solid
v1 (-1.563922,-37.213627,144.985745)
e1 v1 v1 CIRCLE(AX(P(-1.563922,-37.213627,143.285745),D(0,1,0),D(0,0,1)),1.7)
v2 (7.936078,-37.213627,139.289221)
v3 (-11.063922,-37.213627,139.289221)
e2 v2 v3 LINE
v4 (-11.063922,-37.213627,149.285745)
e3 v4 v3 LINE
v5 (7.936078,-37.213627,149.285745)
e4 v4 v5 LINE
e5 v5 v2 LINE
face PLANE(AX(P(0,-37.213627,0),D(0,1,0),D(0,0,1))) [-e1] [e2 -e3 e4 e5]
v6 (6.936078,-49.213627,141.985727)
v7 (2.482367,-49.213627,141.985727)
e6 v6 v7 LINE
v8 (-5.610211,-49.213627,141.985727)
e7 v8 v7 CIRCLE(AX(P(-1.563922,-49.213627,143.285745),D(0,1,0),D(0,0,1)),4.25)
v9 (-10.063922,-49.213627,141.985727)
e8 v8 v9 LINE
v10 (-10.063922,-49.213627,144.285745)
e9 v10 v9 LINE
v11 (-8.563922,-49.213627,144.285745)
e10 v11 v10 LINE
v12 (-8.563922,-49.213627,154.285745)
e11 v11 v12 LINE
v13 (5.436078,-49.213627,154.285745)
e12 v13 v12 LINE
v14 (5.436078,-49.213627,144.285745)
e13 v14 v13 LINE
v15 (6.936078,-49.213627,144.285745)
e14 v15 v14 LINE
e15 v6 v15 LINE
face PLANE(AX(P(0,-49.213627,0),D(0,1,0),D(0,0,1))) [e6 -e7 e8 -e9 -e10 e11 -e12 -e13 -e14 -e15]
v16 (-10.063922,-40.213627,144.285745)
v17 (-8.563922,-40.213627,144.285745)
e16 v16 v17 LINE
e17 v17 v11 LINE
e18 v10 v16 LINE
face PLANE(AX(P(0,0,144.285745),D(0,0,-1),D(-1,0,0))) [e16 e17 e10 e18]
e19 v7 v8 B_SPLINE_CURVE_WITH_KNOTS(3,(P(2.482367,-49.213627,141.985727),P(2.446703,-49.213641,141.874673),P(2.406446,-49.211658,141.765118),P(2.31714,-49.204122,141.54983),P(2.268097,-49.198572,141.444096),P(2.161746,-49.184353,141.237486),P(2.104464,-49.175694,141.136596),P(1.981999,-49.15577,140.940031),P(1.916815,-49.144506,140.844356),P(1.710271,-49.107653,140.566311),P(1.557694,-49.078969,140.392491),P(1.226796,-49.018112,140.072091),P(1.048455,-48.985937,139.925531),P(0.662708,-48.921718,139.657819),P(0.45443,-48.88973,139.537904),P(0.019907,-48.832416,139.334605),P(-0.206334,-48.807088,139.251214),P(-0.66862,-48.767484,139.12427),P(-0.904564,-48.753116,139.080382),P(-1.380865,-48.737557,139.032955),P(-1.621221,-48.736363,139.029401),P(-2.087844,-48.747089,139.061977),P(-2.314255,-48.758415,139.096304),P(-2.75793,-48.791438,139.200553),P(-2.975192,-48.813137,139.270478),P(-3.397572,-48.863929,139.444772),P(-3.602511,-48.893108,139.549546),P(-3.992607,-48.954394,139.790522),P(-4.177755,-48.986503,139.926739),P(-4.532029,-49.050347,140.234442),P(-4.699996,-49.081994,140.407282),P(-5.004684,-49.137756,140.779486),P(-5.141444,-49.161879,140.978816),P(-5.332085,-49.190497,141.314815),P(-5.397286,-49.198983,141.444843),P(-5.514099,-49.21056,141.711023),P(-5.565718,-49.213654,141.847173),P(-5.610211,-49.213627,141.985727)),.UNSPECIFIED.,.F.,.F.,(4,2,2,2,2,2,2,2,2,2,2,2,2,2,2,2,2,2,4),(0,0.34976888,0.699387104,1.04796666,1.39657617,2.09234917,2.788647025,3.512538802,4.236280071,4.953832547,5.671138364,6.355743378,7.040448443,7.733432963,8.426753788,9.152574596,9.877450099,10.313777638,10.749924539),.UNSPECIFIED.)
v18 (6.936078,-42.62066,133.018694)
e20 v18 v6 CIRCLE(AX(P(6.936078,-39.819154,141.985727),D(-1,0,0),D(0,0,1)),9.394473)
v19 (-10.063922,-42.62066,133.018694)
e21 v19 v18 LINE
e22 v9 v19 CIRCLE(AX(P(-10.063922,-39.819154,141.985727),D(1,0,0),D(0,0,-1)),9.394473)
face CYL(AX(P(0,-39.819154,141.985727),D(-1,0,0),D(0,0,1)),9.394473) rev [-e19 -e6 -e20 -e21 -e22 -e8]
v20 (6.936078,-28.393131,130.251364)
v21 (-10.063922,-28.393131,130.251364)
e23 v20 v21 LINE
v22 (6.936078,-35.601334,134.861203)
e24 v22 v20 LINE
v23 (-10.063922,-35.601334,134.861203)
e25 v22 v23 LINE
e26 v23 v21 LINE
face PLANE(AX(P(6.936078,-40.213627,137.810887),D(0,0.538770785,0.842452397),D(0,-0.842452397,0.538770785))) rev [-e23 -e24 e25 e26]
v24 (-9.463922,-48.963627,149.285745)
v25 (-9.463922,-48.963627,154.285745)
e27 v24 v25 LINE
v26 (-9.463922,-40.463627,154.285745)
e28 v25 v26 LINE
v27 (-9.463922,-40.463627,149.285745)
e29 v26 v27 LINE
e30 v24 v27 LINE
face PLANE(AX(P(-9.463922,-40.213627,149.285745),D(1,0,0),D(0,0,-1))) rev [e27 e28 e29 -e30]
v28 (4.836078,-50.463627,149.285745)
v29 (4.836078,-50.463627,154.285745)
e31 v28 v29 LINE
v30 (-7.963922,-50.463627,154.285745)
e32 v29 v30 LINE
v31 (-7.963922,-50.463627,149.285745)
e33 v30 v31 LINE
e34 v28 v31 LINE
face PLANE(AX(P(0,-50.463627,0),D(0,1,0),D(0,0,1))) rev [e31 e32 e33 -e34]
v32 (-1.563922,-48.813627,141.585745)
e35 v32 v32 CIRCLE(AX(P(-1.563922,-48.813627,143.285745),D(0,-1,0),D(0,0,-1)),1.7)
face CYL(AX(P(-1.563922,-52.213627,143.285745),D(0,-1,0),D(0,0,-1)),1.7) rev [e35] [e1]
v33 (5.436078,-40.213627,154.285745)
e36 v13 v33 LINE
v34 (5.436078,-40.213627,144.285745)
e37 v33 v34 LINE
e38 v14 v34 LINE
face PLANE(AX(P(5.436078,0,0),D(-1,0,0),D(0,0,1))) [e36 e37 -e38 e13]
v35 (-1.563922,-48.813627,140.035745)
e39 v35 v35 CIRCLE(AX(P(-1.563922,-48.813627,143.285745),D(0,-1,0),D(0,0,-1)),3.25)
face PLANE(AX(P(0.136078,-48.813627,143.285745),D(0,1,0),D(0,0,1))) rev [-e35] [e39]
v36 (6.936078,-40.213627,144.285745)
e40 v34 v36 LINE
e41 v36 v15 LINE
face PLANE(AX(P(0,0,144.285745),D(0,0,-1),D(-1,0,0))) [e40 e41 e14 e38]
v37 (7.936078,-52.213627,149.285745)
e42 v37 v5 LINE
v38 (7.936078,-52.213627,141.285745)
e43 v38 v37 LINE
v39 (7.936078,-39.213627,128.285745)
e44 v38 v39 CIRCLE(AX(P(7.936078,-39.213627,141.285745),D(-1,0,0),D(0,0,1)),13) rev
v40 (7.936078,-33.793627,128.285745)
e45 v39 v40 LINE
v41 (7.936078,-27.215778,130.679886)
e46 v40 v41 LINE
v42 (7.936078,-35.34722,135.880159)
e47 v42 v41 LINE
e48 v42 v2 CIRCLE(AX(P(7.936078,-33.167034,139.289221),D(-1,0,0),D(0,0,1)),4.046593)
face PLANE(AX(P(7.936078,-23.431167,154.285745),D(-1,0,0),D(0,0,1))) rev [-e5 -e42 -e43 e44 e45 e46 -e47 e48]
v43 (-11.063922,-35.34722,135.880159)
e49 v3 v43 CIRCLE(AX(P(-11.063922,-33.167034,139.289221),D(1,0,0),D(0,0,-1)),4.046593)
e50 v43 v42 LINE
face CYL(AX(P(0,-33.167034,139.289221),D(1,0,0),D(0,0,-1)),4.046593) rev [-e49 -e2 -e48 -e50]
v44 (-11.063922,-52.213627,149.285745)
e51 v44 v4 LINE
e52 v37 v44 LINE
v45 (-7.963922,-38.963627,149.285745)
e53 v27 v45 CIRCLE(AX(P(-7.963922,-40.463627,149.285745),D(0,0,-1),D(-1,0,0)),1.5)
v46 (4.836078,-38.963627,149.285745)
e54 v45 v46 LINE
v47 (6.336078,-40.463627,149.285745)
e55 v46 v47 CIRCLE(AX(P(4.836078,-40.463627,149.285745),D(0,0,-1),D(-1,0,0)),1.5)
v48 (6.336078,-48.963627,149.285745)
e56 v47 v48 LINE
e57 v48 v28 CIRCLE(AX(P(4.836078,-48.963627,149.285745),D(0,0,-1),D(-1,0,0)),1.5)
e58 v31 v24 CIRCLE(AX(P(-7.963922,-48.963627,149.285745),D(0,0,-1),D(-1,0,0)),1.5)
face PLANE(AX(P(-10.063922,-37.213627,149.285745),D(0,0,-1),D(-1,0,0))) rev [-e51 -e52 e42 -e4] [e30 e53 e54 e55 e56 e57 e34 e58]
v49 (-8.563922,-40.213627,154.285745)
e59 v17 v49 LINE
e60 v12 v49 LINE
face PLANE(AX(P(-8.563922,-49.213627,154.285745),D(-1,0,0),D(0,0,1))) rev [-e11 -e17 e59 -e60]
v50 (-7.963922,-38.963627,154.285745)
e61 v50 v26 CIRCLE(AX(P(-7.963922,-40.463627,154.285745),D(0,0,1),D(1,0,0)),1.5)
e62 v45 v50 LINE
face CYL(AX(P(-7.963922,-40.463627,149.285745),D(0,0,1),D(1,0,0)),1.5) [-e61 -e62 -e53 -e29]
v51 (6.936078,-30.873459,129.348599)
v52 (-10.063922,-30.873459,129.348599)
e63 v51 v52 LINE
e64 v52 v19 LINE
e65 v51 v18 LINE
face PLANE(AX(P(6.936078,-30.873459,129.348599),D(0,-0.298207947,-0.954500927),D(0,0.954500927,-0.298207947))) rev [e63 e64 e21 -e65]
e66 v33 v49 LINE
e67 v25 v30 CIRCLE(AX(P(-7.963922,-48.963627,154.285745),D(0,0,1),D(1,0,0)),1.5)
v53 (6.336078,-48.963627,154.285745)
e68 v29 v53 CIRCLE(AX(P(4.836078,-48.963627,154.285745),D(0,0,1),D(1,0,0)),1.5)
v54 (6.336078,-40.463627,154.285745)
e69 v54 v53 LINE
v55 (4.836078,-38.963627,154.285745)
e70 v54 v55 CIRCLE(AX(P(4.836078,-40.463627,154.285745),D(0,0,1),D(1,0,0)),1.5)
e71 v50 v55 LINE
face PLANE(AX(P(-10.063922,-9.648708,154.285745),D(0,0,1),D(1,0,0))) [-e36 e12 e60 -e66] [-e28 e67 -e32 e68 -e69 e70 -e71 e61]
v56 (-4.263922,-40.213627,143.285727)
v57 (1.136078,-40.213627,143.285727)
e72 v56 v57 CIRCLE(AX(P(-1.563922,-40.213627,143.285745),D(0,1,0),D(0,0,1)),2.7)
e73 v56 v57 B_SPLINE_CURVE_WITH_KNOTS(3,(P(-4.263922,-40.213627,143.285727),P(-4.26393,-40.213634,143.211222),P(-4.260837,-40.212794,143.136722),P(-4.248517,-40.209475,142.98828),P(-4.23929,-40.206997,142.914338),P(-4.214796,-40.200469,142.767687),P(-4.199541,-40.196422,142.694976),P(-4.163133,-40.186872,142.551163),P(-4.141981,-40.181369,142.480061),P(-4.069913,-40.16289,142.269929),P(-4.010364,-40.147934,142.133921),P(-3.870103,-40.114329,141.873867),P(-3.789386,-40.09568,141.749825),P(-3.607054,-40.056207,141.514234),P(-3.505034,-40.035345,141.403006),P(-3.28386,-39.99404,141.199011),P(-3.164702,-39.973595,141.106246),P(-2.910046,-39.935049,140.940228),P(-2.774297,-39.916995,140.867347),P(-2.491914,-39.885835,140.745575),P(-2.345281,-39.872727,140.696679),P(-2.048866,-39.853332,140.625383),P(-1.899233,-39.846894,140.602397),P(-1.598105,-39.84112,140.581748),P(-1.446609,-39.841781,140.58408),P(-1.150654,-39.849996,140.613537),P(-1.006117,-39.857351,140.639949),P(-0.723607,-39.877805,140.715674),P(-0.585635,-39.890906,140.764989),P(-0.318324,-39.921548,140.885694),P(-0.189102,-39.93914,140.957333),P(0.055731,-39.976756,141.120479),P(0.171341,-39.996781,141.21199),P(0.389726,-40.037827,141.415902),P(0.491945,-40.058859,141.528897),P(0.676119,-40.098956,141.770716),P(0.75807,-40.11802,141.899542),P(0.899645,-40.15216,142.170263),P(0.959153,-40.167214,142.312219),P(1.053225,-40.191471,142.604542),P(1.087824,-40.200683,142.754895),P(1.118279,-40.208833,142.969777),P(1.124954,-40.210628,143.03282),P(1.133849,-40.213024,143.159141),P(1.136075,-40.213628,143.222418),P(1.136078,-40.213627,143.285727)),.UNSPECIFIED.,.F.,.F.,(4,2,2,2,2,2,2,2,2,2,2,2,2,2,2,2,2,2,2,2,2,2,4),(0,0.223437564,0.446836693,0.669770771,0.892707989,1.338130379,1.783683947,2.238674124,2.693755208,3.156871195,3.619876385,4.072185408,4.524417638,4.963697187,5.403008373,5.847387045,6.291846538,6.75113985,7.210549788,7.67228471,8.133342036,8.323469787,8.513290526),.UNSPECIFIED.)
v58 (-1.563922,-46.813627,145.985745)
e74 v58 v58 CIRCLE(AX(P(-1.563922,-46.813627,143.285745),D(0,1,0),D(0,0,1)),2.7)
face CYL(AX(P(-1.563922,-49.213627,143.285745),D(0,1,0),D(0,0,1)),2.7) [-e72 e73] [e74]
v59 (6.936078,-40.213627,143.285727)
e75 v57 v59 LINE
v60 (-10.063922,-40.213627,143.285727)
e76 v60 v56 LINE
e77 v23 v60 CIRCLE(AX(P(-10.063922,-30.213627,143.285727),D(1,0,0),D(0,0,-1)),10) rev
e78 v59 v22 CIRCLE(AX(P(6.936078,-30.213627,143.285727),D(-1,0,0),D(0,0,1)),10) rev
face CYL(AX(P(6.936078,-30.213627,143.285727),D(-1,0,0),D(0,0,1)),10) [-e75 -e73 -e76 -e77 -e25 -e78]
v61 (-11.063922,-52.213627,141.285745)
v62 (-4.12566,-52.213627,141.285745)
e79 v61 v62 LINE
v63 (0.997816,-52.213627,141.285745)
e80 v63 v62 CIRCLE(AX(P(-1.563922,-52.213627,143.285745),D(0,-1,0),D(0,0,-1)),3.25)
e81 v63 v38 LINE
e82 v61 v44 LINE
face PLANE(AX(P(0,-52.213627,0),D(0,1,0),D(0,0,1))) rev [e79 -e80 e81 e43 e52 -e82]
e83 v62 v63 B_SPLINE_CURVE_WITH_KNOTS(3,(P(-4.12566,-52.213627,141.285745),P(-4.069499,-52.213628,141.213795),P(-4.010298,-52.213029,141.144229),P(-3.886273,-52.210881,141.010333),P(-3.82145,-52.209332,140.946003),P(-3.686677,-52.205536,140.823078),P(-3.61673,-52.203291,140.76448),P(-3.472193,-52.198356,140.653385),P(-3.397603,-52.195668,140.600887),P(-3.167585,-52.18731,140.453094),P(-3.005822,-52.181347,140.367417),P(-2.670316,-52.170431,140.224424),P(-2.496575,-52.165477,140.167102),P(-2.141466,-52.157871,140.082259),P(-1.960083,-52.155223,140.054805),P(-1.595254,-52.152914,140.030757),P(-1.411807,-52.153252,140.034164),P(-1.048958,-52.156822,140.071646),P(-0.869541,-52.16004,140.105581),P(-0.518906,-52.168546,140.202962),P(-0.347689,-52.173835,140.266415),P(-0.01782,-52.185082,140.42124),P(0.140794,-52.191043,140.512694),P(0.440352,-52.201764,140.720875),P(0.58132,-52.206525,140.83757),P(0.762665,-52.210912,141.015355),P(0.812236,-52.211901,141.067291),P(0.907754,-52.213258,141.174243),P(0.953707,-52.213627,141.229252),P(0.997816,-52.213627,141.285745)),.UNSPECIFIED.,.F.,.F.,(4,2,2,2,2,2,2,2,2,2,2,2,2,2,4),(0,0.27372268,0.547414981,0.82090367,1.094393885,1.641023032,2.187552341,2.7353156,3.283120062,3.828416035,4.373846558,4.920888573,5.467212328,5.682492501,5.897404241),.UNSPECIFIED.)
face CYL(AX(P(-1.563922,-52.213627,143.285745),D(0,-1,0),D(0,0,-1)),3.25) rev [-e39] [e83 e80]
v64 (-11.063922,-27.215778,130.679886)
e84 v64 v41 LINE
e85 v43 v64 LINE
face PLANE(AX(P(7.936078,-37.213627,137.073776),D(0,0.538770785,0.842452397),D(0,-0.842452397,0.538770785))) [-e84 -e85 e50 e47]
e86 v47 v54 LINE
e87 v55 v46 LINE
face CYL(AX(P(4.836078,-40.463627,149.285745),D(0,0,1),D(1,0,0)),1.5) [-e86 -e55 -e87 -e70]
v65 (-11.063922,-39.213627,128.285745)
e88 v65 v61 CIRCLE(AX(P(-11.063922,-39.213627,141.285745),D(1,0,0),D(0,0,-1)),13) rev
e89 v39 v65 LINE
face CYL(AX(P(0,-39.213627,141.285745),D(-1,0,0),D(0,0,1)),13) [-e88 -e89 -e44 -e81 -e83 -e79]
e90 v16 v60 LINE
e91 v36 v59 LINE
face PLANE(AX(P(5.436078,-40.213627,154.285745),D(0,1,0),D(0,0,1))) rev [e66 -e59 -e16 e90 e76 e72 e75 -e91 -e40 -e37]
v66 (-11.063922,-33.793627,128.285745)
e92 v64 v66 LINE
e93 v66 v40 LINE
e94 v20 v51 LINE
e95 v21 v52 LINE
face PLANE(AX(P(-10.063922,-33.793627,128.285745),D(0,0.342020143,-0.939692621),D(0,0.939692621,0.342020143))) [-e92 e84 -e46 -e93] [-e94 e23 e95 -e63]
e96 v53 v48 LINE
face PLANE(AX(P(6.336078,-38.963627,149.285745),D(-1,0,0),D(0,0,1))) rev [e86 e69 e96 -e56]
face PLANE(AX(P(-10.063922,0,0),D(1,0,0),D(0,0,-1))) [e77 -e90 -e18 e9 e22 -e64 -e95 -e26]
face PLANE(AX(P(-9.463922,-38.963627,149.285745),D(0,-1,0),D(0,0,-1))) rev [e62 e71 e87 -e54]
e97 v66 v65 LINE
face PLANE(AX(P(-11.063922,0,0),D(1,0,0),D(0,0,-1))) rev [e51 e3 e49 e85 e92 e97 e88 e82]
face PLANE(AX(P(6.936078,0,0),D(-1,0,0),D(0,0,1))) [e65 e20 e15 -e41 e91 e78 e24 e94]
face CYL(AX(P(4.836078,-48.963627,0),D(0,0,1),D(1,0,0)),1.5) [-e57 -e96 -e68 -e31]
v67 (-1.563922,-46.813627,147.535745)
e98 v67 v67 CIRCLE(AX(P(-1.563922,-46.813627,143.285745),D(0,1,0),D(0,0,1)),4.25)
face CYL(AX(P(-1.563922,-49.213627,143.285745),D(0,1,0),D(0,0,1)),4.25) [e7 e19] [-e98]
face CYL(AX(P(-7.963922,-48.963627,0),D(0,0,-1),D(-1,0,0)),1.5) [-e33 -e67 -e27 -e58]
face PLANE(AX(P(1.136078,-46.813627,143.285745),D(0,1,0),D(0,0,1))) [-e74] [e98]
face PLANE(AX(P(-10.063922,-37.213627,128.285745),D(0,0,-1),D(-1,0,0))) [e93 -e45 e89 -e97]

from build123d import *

# Parameters (mm, degrees)
SALIENTE_EXTRUIR1_DEPTH                              = 18
SALIENTE_EXTRUIR2_DEPTH                              = 12
CORTAR_EXTRUIR1_DEPTH                                = 17
CROQUIS4_W                                           = 16.47485784
CROQUIS4_H                                           = 9
CORTAR_EXTRUIR2_DEPTH                                = 15.5
CORTAR_EXTRUIR3_DEPTH                                = 5
CROQUIS6_W                                           = 18
CROQUIS6_H                                           = 12.211968345
CORTAR_EXTRUIR4_DEPTH                                = 27.564918354
SALIENTE_EXTRUIR3_DEPTH                              = 9
SALIENTE_EXTRUIR4_DEPTH                              = 1.25
CROQUIS9_W                                           = 18
CROQUIS9_H                                           = 21
SALIENTE_EXTRUIR5_DEPTH                              = 1.75
CROQUIS10_W                                          = 1.5
CROQUIS10_H                                          = 9
CORTAR_EXTRUIR5_DEPTH                                = 6.47485784
CROQUIS11_W                                          = 1.5
CROQUIS11_H                                          = 9
CORTAR_EXTRUIR6_DEPTH                                = 6.47485784
SALIENTE_EXTRUIR6_DEPTH                              = 1
NGULO_DE_SALIDA1_ANGLE                               = 32.6
REFRENTADO_PARA_TORNILLO_CON_CABEZA_HEXA_D           = 3.4
REFRENTADO_PARA_TORNILLO_CON_CABEZA_HEXA_DEPTH       = 24.997848167
REFRENTADO_PARA_TORNILLO_CON_CABEZA_HEXA_CBORE_D     = 6.5
REFRENTADO_PARA_TORNILLO_CON_CABEZA_HEXA_CBORE_DEPTH = 3.4
REDONDEO1_R                                          = 1.5
REDONDEO2_R                                          = 4.046592592
REDONDEO3_R                                          = 9.394473
REDONDEO4_R                                          = 10
REDONDEO5_R                                          = 13.000000028


with BuildPart() as part:
    # Croquis1 → Saliente-Extruir1 (new body)
    with BuildSketch(Plane(origin=(7.936078108, 0, 0), x_dir=(0, 0, -1), z_dir=(1, 0, 0))):
        with BuildLine():
            Line((-154.285744598, -37.213626554), (-128.285744598, -37.213626554))
            Line((-128.285744598, -37.213626554), (-128.285744598, -33.793626733))
            Line((-128.285744598, -33.793626733), (-137.073776253, -9.6487082))
            Line((-137.073776253, -9.6487082), (-149.285744598, -9.6487082))
            add(Edge.make_bspline(
                [(-154.285744598, -9.6487082), (-152.619077931, -9.6487082), (-150.952411265, -9.6487082), (-149.285744598, -9.6487082)],
                knots=[0, 0, 0, 0, 1, 1, 1, 1], degree=3))
            add(Edge.make_bspline(
                [(-154.285744598, -9.6487082), (-154.285744598, -18.837014318), (-154.285744598, -28.025320436), (-154.285744598, -37.213626554)],
                knots=[0, 0, 0, 0, 1, 1, 1, 1], degree=3))
        make_face()
    extrude(amount=-SALIENTE_EXTRUIR1_DEPTH)

    # Croquis2 → Saliente-Extruir2 (add)
    with BuildSketch(Plane.XZ.offset(37.213626554)):
        with BuildLine():
            Line((-10.063921892, 154.285744598), (7.936078108, 154.285744598))
            add(Edge.make_bspline(
                [(7.936078108, 154.285744598), (7.936078108, 152.619077931), (7.936078108, 150.952411265), (7.936078108, 149.285744598)],
                knots=[0, 0, 0, 0, 1, 1, 1, 1], degree=3))
            Line((7.936078108, 149.285744598), (7.936078108, 128.285744598))
            Line((7.936078108, 128.285744598), (-10.063921892, 128.285744598))
            Line((-10.063921892, 128.285744598), (-10.063921892, 154.285744598))
        make_face()
    extrude(amount=SALIENTE_EXTRUIR2_DEPTH)

    # Croquis3 → Cortar-Extruir1 (cut)
    with BuildSketch(Plane.ZY.offset(10.063921892)):
        Polygon((135.078487354, -49.213626554), (137.810886758, -49.213626554), (137.810886758, -40.213626554), (130.25136436, -28.393130822), (129.348598898, -30.873458543), align=None)
    extrude(amount=-CORTAR_EXTRUIR1_DEPTH, mode=Mode.SUBTRACT)

    # Croquis4 → Cortar-Extruir2 (cut)
    with BuildSketch(Plane.ZY.offset(10.063921892)):
        with Locations((146.048315678, -44.713626554)):
            Rectangle(CROQUIS4_W, CROQUIS4_H)
    extrude(amount=-CORTAR_EXTRUIR2_DEPTH, mode=Mode.SUBTRACT)

    # Croquis5 → Cortar-Extruir3 (cut)
    with BuildSketch(Plane.XY.offset(154.285744598)):
        with BuildLine():
            Line((-10.063921892, -40.213626554), (-9.463921892, -40.213626554))
            Line((-9.463921892, -40.213626554), (-9.463921892, -38.963626554))
            Line((-9.463921892, -38.963626554), (6.336078108, -38.963626554))
            Line((6.336078108, -38.963626554), (6.336078108, -49.213626554))
            Line((6.336078108, -49.213626554), (7.936078108, -49.213626554))
            Line((7.936078108, -49.213626554), (7.936078108, -37.213626554))
            add(Edge.make_bspline(
                [(7.936078108, -9.6487082), (7.936078108, -18.837014318), (7.936078108, -28.025320436), (7.936078108, -37.213626554)],
                knots=[0, 0, 0, 0, 1, 1, 1, 1], degree=3))
            Line((7.936078108, -9.6487082), (-10.063921892, -9.6487082))
            add(Edge.make_bspline(
                [(-10.063921892, -9.6487082), (-10.063921892, -18.837014318), (-10.063921892, -28.025320436), (-10.063921892, -37.213626554)],
                knots=[0, 0, 0, 0, 1, 1, 1, 1], degree=3))
            Line((-10.063921892, -37.213626554), (-10.063921892, -40.213626554))
        make_face()
    extrude(amount=-CORTAR_EXTRUIR3_DEPTH, mode=Mode.SUBTRACT)

    # Croquis6 → Cortar-Extruir4 (cut)
    with BuildSketch(Plane(origin=(0, -9.6487082, 0), x_dir=(-1, 0, 0), z_dir=(0, 1, 0))):
        with Locations((1.063921892, 143.179760426)):
            Rectangle(CROQUIS6_W, CROQUIS6_H)
    extrude(amount=-CORTAR_EXTRUIR4_DEPTH, mode=Mode.SUBTRACT)

    # Croquis7 → Saliente-Extruir3 (add)
    with BuildSketch(Plane.XZ.offset(40.213626554)):
        Polygon((-9.463921892, 154.285744598), (-8.563921892, 154.285744598), (-8.563921892, 137.810886758), (-10.063921892, 137.810886758), (-10.063921892, 149.285744598), (-9.463921892, 149.285744598), align=None)
    extrude(amount=SALIENTE_EXTRUIR3_DEPTH)

    # Croquis8 → Saliente-Extruir4 (add)
    with BuildSketch(Plane.XZ.offset(49.213626554)):
        Polygon((-9.463921892, 154.285744598), (6.336078108, 154.285744598), (6.336078108, 149.285744598), (7.936078108, 149.285744598), (7.936078108, 128.285744598), (-10.063921892, 128.285744598), (-10.063921892, 149.285744598), (-9.463921892, 149.285744598), align=None)
    extrude(amount=SALIENTE_EXTRUIR4_DEPTH)

    # Croquis9 → Saliente-Extruir5 (add)
    with BuildSketch(Plane.XZ.offset(50.463626554)):
        with Locations((-1.063921892, 138.785744598)):
            Rectangle(CROQUIS9_W, CROQUIS9_H)
    extrude(amount=SALIENTE_EXTRUIR5_DEPTH)

    # Croquis10 → Cortar-Extruir5 (cut)
    with BuildSketch(Plane(origin=(0, 0, 137.810886758), x_dir=(-1, 0, 0), z_dir=(0, 0, -1))):
        with Locations((-6.186078108, -44.713626554)):
            Rectangle(CROQUIS10_W, CROQUIS10_H)
    extrude(amount=-CORTAR_EXTRUIR5_DEPTH, mode=Mode.SUBTRACT)

    # Croquis11 → Cortar-Extruir6 (cut)
    with BuildSketch(Plane(origin=(0, 0, 137.810886758), x_dir=(-1, 0, 0), z_dir=(0, 0, -1))):
        with Locations((9.313921892, -44.713626554)):
            Rectangle(CROQUIS11_W, CROQUIS11_H)
    extrude(amount=-CORTAR_EXTRUIR6_DEPTH, mode=Mode.SUBTRACT)

    # Croquis12 → Saliente-Extruir6 (add)
    with BuildSketch(Plane.ZY.offset(10.063921892)):
        Polygon((149.285744598, -52.213626554), (128.285744598, -52.213626554), (128.285744598, -33.793626733), (137.073776253, -9.6487082), (137.073776253, -37.213626554), (149.285744598, -37.213626554), align=None)
    extrude(amount=SALIENTE_EXTRUIR6_DEPTH)

    # Ángulo de salida1
    ngulo_de_salida1_faces = [part.faces().sort_by_distance(p)[0] for p in [
        (-1.563921892, -23.431167377, 137.073776253),
    ]]
    draft(ngulo_de_salida1_faces, Plane.ZX.offset(-37.213626554), NGULO_DE_SALIDA1_ANGLE)

    # Croquis13 → Revolución1 (revolve)
    with BuildSketch(Plane(origin=(0, 0, 143.285744598), x_dir=(-1, 0, 0), z_dir=(0, 0, -1)), mode=Mode.PRIVATE) as revoluci_n1_sk:
        Polygon((-2.686078108, -49.213626554), (1.563921892, -49.213626554), (1.563921892, -40.213626554), (-1.136078108, -40.213626554), (-1.136078108, -46.813626554), (-2.686078108, -46.813626554), align=None)
    revolve(revoluci_n1_sk.sketch.rotate(Axis((-1.563921892, -49.213626554, 143.285744598), (0, 1, 0)), 270), axis=Axis((-1.563921892, -49.213626554, 143.285744598), (0, 1, 0)))

    # Refrentado para tornillo con cabeza hexagonal de M31
    with Locations(Plane(origin=(0, -52.213626554, 0), x_dir=(-1, 0, 0), z_dir=(0, -1, 0))):
        with Locations((1.563921892, -143.285744598)):
            CounterBoreHole(REFRENTADO_PARA_TORNILLO_CON_CABEZA_HEXA_D / 2, REFRENTADO_PARA_TORNILLO_CON_CABEZA_HEXA_CBORE_D / 2, REFRENTADO_PARA_TORNILLO_CON_CABEZA_HEXA_CBORE_DEPTH, depth=REFRENTADO_PARA_TORNILLO_CON_CABEZA_HEXA_DEPTH)

    # Redondeo1
    redondeo1_edges = [part.edges().sort_by_distance(p)[0] for p in [
        (6.336078108, -50.463626554, 151.785744598),
        (6.336078108, -38.963626554, 151.785744598),
        (-9.463921892, -50.463626554, 151.785744598),
        (-9.463921892, -38.963626554, 151.785744598),
    ]]
    fillet(redondeo1_edges, radius=REDONDEO1_R)

    # Redondeo2
    redondeo2_edges = [part.edges().sort_by_distance(p)[0] for p in [
        (-1.563921892, -37.213626554, 137.073776253),
    ]]
    fillet(redondeo2_edges, radius=REDONDEO2_R)

    # Redondeo3
    # the kernel refuses this fillet: 9.394473 mm, written as the material it adds along each edge
    with BuildSketch(Plane(origin=(-10.063921892, -49.213626554, 135.078487354), x_dir=(0, 0.954500927456638, -0.2982079467157403), z_dir=(1, 0, 0))) as redondeo3_piece_1_section:
        with BuildLine():
            CenterArc((REDONDEO3_R * 0.735245019776, REDONDEO3_R), REDONDEO3_R, 197.35, 72.65)
            Line((-REDONDEO3_R * 0.21925590768, REDONDEO3_R * 0.701792053284), (0, 0))
            Line((0, 0), (REDONDEO3_R * 0.735245019776, 0))
        make_face()
    redondeo3_piece_1 = extrude(amount=17, mode=Mode.PRIVATE)
    redondeo3_piece_1 = redondeo3_piece_1 - Plane(origin=(-1.563921892, -47.780974958, 143.285744598), x_dir=(0, 0, 1), z_dir=(0, -1, 0)) * Cylinder(4.25, 62, mode=Mode.PRIVATE)
    add(redondeo3_piece_1)

    # Redondeo4
    # the kernel refuses this fillet: 10 mm, written as the material it takes off along each edge
    with BuildSketch(Plane(origin=(6.936078108, -40.213626554, 137.810886758), x_dir=(-2.541450920679997e-12, 0, 1.0), z_dir=(-1.0, -2.5749151914609573e-12, -2.5414509206799975e-12))) as redondeo4_piece_1_section:
        with BuildLine():
            CenterArc((REDONDEO4_R * 0.547484008153, REDONDEO4_R), REDONDEO4_R, 212.6, 57.4)
            Line((-REDONDEO4_R * 0.294968388853, REDONDEO4_R * 0.461229214991), (0, 0))
            Line((0, 0), (REDONDEO4_R * 0.547484008153, 0))
        make_face()
    redondeo4_piece_1 = extrude(amount=15.5, mode=Mode.PRIVATE)
    redondeo4_piece_1 = redondeo4_piece_1 - Plane(origin=(-1.563921892, -39.236985305, 143.285744598), x_dir=(0, 0, 1), z_dir=(0, -1, 0)) * Cylinder(2.7, 53, mode=Mode.PRIVATE)
    add(redondeo4_piece_1, mode=Mode.SUBTRACT)
    with BuildSketch(Plane(origin=(-10.063921892, -40.213626554, 137.810886758), x_dir=(0, 0, 1), z_dir=(1, 0, 0))) as redondeo4_piece_2:
        with BuildLine():
            CenterArc((REDONDEO4_R * 0.547484008153, -REDONDEO4_R), REDONDEO4_R, 90, 57.4)
            Line((-REDONDEO4_R * 0.294968388853, -REDONDEO4_R * 0.461229214991), (0, 0))
            Line((0, 0), (REDONDEO4_R * 0.547484008153, 0))
        make_face()
    extrude(amount=1.5, mode=Mode.SUBTRACT)

    # Redondeo5
    # the kernel refuses this fillet: 13.000000028 mm, written as the material it takes off along each edge
    with BuildSketch(Plane(origin=(40.436078177, -52.213626554, 128.285744598), x_dir=(0, 1, 0), z_dir=(-1, 0, 0))) as redondeo5_piece_1:
        with BuildLine():
            CenterArc((REDONDEO5_R, -REDONDEO5_R), REDONDEO5_R, 90, 90)
            Line((0, -REDONDEO5_R), (0, 0))
            Line((0, 0), (REDONDEO5_R, 0))
        make_face()
    extrude(amount=84.000000138, mode=Mode.SUBTRACT)


solid = part.part
